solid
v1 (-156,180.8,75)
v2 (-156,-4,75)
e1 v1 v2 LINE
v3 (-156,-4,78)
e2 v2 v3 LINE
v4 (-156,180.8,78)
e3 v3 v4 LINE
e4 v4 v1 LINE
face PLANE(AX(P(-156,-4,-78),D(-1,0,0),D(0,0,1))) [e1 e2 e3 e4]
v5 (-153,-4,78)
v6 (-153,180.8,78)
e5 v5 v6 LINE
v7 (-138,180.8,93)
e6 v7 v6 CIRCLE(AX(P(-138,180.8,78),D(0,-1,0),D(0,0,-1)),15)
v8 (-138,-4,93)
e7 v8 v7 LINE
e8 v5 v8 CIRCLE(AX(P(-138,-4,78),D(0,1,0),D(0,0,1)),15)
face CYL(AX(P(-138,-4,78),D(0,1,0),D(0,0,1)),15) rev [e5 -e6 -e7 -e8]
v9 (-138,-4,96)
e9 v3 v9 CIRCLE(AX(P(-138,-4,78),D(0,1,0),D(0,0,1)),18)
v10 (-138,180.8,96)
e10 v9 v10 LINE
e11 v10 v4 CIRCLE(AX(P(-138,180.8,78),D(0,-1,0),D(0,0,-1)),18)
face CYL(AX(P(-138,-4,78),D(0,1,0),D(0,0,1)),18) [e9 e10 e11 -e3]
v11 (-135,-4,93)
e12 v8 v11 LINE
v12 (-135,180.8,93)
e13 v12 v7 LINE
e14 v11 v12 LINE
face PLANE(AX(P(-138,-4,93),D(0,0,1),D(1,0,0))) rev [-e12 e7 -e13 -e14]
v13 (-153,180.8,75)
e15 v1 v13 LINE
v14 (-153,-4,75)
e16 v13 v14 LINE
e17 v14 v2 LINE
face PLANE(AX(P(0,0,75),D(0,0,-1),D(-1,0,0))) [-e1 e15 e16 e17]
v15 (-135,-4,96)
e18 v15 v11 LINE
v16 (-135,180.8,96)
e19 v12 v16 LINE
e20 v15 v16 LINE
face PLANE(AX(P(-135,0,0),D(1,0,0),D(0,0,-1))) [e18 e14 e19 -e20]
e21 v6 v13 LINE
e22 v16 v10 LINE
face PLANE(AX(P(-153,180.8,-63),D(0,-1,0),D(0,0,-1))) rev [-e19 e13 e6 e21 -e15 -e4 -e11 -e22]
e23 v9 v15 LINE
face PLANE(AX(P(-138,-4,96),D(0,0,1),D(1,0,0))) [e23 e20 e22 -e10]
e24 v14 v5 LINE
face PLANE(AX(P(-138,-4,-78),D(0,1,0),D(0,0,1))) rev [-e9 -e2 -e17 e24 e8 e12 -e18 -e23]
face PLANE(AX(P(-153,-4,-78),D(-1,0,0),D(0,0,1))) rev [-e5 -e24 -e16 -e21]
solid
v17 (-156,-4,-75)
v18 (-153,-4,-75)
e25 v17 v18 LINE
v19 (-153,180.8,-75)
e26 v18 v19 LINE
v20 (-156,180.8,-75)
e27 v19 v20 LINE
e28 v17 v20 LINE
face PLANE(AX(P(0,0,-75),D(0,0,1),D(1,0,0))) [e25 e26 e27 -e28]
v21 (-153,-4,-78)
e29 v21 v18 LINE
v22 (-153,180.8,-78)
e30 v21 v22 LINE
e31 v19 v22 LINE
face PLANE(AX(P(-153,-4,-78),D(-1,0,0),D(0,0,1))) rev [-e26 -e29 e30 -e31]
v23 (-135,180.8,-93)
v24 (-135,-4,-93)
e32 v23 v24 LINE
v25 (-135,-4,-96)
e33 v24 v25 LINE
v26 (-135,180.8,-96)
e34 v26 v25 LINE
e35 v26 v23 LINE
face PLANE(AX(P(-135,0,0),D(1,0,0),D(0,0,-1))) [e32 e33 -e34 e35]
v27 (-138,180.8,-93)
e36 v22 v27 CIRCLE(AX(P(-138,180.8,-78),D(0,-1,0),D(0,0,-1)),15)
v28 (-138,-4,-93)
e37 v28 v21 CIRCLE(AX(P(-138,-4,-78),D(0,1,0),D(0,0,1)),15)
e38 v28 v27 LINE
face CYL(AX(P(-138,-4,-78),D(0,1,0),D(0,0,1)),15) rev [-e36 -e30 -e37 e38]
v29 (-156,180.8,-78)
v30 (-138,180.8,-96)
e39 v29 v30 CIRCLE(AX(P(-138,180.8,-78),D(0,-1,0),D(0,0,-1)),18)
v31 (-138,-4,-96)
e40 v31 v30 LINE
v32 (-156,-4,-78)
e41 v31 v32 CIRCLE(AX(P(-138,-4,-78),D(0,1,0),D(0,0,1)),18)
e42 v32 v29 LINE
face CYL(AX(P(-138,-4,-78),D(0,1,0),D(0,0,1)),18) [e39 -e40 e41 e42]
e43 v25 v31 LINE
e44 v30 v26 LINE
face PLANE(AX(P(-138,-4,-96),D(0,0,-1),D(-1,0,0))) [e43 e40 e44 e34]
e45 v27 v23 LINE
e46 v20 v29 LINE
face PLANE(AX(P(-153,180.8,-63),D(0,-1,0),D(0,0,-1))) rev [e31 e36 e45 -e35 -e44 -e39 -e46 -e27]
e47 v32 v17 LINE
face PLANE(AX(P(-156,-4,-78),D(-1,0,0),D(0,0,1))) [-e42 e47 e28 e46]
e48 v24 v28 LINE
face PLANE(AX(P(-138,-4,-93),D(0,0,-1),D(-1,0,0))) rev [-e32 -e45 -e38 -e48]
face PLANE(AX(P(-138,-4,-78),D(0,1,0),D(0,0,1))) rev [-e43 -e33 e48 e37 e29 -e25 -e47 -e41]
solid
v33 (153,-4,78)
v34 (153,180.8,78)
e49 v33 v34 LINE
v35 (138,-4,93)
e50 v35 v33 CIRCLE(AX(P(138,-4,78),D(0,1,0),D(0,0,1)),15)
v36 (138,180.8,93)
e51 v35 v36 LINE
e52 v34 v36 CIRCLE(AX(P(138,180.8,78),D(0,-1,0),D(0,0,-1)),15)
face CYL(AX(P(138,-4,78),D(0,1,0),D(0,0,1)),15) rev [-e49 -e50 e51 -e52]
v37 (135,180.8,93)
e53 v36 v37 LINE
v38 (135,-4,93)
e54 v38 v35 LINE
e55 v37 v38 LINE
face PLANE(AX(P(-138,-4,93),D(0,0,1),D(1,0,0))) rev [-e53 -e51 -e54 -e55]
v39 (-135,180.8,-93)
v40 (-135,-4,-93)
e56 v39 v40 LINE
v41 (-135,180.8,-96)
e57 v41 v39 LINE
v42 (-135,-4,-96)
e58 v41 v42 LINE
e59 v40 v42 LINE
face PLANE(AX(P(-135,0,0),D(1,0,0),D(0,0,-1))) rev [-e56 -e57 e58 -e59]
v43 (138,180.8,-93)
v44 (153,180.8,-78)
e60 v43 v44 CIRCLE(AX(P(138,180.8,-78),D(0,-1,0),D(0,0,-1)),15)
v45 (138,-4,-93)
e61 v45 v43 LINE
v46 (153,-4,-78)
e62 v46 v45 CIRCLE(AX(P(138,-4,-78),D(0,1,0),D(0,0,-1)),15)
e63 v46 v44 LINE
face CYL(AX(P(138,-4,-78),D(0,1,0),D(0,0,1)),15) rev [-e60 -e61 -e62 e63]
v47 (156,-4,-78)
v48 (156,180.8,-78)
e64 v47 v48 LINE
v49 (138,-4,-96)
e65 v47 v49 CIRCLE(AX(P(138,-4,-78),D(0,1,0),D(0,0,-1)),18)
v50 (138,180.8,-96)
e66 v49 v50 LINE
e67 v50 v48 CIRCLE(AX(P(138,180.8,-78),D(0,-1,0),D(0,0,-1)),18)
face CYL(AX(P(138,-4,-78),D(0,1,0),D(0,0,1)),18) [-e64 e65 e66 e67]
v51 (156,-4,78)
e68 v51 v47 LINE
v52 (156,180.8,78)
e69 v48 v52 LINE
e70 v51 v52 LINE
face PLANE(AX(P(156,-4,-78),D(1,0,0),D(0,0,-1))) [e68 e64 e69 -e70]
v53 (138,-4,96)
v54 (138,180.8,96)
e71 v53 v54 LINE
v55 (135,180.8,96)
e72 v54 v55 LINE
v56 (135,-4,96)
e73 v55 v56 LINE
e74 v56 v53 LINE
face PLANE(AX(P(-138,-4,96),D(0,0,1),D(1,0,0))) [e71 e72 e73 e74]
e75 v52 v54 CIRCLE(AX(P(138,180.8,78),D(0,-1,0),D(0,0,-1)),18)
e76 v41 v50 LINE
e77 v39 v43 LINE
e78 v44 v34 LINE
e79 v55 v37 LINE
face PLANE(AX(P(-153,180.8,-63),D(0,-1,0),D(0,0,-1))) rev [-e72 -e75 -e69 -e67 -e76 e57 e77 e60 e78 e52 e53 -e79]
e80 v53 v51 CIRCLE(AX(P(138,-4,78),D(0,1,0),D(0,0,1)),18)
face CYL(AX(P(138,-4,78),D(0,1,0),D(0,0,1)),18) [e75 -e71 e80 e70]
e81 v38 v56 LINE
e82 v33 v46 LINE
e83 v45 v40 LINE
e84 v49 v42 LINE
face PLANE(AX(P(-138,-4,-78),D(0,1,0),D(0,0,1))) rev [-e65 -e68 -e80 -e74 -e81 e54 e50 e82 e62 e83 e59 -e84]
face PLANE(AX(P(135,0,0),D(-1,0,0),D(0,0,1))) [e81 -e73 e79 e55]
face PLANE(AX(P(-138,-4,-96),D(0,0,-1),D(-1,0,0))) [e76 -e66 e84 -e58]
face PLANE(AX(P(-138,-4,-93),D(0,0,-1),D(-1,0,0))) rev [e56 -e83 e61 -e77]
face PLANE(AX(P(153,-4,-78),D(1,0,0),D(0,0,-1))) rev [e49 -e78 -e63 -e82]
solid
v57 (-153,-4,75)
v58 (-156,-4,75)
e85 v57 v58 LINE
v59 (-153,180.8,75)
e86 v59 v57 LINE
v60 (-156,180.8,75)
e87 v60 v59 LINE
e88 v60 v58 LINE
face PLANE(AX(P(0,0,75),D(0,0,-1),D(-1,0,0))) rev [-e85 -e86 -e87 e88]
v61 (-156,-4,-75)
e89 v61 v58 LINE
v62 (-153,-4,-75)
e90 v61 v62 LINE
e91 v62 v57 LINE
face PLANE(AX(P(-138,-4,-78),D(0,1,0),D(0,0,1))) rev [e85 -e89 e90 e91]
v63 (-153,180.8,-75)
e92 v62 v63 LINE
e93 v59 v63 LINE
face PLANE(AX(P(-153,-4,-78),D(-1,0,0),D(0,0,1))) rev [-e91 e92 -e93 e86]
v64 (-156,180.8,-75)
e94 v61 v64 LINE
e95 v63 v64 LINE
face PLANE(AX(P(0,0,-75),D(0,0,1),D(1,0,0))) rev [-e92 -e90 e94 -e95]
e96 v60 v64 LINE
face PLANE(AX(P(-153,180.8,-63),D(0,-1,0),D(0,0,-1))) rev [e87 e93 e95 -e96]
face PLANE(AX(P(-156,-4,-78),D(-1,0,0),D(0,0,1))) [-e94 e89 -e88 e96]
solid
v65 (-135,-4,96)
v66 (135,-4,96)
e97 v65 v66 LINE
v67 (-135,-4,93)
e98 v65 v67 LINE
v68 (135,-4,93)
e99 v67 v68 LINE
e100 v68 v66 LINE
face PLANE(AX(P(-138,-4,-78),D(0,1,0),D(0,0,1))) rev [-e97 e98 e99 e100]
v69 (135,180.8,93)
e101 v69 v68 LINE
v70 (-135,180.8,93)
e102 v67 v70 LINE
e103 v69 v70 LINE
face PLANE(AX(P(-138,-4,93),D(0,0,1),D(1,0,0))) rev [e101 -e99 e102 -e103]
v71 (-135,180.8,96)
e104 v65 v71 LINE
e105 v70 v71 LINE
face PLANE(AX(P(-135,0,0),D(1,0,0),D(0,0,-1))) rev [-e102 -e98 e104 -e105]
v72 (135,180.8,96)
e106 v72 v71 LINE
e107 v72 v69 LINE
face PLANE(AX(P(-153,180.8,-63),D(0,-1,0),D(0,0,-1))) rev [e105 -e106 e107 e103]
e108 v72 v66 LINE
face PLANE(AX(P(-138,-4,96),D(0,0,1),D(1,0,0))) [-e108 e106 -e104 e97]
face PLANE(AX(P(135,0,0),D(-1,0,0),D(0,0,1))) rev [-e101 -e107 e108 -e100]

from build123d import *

# Parameters (mm, degrees)
BOSS_EXTRUDE1_DEPTH      = 180.8
BOSS_EXTRUDE1_DEPTH_BACK = 4
SPLIT1_START             = -4
SPLIT1_OUTLINE_W         = 270
SPLIT1_OUTLINE_H         = 3
SPLIT1_DEPTH             = 184.8
SPLIT1_2_OUTLINE_W       = 3
SPLIT1_2_OUTLINE_H       = 150
SPLIT1_2_DEPTH           = 184.8
SPLIT1_3_DEPTH           = 184.8
SPLIT1_4_DEPTH           = 184.8
SPLIT1_START_2           = -156
SPLIT1_5_OUTLINE_W       = 184.8
SPLIT1_5_OUTLINE_H       = 189
SPLIT1_5_DEPTH           = 291
SPLIT1_START_3           = -151.250554839
SPLIT1_6_OUTLINE_W       = 184.8
SPLIT1_6_OUTLINE_H       = 3
SPLIT1_6_DEPTH           = 16.250554839


# Read off the part's stored shape, not the designer's step: Split1
with BuildPart() as part:
    # Sketch1 → Boss-Extrude1 (new, two sides: drawn at the far end of the back side and taken through both)
    with BuildSketch(Plane(origin=(0, 0, 0), x_dir=(1, 0, 0), z_dir=(0, 1, 0)).offset(-BOSS_EXTRUDE1_DEPTH_BACK)):
        with BuildLine():
            Line((-156, 78), (-156, -78))
            ThreePointArc((-156, -78), (-150.727922061, -90.727922061), (-138, -96))
            Line((-138, -96), (138, -96))
            ThreePointArc((138, -96), (150.727922061, -90.727922061), (156, -78))
            Line((156, -78), (156, 78))
            ThreePointArc((156, 78), (150.727922061, 90.727922061), (138, 96))
            Line((138, 96), (-138, 96))
            ThreePointArc((-138, 96), (-150.727922061, 90.727922061), (-156, 78))
        make_face()
        with BuildLine():
            Line((-138, 93), (138, 93))
            ThreePointArc((138, 93), (148.606601718, 88.606601718), (153, 78))
            Line((153, 78), (153, -78))
            ThreePointArc((153, -78), (148.606601718, -88.606601718), (138, -93))
            Line((138, -93), (-138, -93))
            ThreePointArc((-138, -93), (-148.606601718, -88.606601718), (-153, -78))
            Line((-153, -78), (-153, 78))
            ThreePointArc((-153, 78), (-148.606601718, 88.606601718), (-138, 93))
        make_face(mode=Mode.SUBTRACT)
    extrude(amount=BOSS_EXTRUDE1_DEPTH + BOSS_EXTRUDE1_DEPTH_BACK)

    # Split1 5 outline → Split1 5 (cut)
    with BuildSketch(Plane.YZ.offset(SPLIT1_START_2)):
        with Locations((88.4, 1.5)):
            Rectangle(SPLIT1_5_OUTLINE_W, SPLIT1_5_OUTLINE_H)
    extrude(amount=SPLIT1_5_DEPTH, mode=Mode.SUBTRACT)

    # Split1 6 outline → Split1 6 (cut)
    with BuildSketch(Plane.YZ.offset(SPLIT1_START_3)):
        with Locations((88.4, -94.5)):
            Rectangle(SPLIT1_6_OUTLINE_W, SPLIT1_6_OUTLINE_H)
    extrude(amount=SPLIT1_6_DEPTH, mode=Mode.SUBTRACT)


with BuildPart() as body_2:
    # Split1 outline → Split1 (new body)
    with BuildSketch(Plane(origin=(0, 0, 0), x_dir=(1, 0, 0), z_dir=(0, 1, 0)).offset(SPLIT1_START)):
        with Locations((0, -94.5)):
            Rectangle(SPLIT1_OUTLINE_W, SPLIT1_OUTLINE_H)
    extrude(amount=SPLIT1_DEPTH)


with BuildPart() as body_3:
    # Split1 2 outline → Split1 2 (new body)
    with BuildSketch(Plane(origin=(0, 0, 0), x_dir=(1, 0, 0), z_dir=(0, 1, 0)).offset(SPLIT1_START)):
        with Locations((-154.5, 0)):
            Rectangle(SPLIT1_2_OUTLINE_W, SPLIT1_2_OUTLINE_H)
    extrude(amount=SPLIT1_2_DEPTH)


with BuildPart() as body_4:
    # Split1 3 outline → Split1 3 (new body)
    with BuildSketch(Plane(origin=(0, 0, 0), x_dir=(1, 0, 0), z_dir=(0, 1, 0)).offset(SPLIT1_START)):
        with BuildLine():
            Line((-138, 93), (-135, 93))
            Line((-135, 93), (-135, 96))
            Line((-135, 96), (-138, 96))
            ThreePointArc((-138, 96), (-150.727922061, 90.727922061), (-156, 78))
            Line((-156, 78), (-156, 75))
            Line((-156, 75), (-153, 75))
            Line((-153, 75), (-153, 78))
            ThreePointArc((-153, 78), (-148.606601718, 88.606601718), (-138, 93))
        make_face()
    extrude(amount=SPLIT1_3_DEPTH)


with BuildPart() as body_5:
    # Split1 4 outline → Split1 4 (new body)
    with BuildSketch(Plane(origin=(0, 0, 0), x_dir=(1, 0, 0), z_dir=(0, 1, 0)).offset(SPLIT1_START)):
        with BuildLine():
            Line((-138, -96), (-135, -96))
            Line((-135, -96), (-135, -93))
            Line((-135, -93), (-138, -93))
            ThreePointArc((-138, -93), (-148.606601718, -88.606601718), (-153, -78))
            Line((-153, -78), (-153, -75))
            Line((-153, -75), (-156, -75))
            Line((-156, -75), (-156, -78))
            ThreePointArc((-156, -78), (-150.727922061, -90.727922061), (-138, -96))
        make_face()
    extrude(amount=SPLIT1_4_DEPTH)


solid = Compound([part.part, body_2.part, body_3.part, body_4.part, body_5.part])
